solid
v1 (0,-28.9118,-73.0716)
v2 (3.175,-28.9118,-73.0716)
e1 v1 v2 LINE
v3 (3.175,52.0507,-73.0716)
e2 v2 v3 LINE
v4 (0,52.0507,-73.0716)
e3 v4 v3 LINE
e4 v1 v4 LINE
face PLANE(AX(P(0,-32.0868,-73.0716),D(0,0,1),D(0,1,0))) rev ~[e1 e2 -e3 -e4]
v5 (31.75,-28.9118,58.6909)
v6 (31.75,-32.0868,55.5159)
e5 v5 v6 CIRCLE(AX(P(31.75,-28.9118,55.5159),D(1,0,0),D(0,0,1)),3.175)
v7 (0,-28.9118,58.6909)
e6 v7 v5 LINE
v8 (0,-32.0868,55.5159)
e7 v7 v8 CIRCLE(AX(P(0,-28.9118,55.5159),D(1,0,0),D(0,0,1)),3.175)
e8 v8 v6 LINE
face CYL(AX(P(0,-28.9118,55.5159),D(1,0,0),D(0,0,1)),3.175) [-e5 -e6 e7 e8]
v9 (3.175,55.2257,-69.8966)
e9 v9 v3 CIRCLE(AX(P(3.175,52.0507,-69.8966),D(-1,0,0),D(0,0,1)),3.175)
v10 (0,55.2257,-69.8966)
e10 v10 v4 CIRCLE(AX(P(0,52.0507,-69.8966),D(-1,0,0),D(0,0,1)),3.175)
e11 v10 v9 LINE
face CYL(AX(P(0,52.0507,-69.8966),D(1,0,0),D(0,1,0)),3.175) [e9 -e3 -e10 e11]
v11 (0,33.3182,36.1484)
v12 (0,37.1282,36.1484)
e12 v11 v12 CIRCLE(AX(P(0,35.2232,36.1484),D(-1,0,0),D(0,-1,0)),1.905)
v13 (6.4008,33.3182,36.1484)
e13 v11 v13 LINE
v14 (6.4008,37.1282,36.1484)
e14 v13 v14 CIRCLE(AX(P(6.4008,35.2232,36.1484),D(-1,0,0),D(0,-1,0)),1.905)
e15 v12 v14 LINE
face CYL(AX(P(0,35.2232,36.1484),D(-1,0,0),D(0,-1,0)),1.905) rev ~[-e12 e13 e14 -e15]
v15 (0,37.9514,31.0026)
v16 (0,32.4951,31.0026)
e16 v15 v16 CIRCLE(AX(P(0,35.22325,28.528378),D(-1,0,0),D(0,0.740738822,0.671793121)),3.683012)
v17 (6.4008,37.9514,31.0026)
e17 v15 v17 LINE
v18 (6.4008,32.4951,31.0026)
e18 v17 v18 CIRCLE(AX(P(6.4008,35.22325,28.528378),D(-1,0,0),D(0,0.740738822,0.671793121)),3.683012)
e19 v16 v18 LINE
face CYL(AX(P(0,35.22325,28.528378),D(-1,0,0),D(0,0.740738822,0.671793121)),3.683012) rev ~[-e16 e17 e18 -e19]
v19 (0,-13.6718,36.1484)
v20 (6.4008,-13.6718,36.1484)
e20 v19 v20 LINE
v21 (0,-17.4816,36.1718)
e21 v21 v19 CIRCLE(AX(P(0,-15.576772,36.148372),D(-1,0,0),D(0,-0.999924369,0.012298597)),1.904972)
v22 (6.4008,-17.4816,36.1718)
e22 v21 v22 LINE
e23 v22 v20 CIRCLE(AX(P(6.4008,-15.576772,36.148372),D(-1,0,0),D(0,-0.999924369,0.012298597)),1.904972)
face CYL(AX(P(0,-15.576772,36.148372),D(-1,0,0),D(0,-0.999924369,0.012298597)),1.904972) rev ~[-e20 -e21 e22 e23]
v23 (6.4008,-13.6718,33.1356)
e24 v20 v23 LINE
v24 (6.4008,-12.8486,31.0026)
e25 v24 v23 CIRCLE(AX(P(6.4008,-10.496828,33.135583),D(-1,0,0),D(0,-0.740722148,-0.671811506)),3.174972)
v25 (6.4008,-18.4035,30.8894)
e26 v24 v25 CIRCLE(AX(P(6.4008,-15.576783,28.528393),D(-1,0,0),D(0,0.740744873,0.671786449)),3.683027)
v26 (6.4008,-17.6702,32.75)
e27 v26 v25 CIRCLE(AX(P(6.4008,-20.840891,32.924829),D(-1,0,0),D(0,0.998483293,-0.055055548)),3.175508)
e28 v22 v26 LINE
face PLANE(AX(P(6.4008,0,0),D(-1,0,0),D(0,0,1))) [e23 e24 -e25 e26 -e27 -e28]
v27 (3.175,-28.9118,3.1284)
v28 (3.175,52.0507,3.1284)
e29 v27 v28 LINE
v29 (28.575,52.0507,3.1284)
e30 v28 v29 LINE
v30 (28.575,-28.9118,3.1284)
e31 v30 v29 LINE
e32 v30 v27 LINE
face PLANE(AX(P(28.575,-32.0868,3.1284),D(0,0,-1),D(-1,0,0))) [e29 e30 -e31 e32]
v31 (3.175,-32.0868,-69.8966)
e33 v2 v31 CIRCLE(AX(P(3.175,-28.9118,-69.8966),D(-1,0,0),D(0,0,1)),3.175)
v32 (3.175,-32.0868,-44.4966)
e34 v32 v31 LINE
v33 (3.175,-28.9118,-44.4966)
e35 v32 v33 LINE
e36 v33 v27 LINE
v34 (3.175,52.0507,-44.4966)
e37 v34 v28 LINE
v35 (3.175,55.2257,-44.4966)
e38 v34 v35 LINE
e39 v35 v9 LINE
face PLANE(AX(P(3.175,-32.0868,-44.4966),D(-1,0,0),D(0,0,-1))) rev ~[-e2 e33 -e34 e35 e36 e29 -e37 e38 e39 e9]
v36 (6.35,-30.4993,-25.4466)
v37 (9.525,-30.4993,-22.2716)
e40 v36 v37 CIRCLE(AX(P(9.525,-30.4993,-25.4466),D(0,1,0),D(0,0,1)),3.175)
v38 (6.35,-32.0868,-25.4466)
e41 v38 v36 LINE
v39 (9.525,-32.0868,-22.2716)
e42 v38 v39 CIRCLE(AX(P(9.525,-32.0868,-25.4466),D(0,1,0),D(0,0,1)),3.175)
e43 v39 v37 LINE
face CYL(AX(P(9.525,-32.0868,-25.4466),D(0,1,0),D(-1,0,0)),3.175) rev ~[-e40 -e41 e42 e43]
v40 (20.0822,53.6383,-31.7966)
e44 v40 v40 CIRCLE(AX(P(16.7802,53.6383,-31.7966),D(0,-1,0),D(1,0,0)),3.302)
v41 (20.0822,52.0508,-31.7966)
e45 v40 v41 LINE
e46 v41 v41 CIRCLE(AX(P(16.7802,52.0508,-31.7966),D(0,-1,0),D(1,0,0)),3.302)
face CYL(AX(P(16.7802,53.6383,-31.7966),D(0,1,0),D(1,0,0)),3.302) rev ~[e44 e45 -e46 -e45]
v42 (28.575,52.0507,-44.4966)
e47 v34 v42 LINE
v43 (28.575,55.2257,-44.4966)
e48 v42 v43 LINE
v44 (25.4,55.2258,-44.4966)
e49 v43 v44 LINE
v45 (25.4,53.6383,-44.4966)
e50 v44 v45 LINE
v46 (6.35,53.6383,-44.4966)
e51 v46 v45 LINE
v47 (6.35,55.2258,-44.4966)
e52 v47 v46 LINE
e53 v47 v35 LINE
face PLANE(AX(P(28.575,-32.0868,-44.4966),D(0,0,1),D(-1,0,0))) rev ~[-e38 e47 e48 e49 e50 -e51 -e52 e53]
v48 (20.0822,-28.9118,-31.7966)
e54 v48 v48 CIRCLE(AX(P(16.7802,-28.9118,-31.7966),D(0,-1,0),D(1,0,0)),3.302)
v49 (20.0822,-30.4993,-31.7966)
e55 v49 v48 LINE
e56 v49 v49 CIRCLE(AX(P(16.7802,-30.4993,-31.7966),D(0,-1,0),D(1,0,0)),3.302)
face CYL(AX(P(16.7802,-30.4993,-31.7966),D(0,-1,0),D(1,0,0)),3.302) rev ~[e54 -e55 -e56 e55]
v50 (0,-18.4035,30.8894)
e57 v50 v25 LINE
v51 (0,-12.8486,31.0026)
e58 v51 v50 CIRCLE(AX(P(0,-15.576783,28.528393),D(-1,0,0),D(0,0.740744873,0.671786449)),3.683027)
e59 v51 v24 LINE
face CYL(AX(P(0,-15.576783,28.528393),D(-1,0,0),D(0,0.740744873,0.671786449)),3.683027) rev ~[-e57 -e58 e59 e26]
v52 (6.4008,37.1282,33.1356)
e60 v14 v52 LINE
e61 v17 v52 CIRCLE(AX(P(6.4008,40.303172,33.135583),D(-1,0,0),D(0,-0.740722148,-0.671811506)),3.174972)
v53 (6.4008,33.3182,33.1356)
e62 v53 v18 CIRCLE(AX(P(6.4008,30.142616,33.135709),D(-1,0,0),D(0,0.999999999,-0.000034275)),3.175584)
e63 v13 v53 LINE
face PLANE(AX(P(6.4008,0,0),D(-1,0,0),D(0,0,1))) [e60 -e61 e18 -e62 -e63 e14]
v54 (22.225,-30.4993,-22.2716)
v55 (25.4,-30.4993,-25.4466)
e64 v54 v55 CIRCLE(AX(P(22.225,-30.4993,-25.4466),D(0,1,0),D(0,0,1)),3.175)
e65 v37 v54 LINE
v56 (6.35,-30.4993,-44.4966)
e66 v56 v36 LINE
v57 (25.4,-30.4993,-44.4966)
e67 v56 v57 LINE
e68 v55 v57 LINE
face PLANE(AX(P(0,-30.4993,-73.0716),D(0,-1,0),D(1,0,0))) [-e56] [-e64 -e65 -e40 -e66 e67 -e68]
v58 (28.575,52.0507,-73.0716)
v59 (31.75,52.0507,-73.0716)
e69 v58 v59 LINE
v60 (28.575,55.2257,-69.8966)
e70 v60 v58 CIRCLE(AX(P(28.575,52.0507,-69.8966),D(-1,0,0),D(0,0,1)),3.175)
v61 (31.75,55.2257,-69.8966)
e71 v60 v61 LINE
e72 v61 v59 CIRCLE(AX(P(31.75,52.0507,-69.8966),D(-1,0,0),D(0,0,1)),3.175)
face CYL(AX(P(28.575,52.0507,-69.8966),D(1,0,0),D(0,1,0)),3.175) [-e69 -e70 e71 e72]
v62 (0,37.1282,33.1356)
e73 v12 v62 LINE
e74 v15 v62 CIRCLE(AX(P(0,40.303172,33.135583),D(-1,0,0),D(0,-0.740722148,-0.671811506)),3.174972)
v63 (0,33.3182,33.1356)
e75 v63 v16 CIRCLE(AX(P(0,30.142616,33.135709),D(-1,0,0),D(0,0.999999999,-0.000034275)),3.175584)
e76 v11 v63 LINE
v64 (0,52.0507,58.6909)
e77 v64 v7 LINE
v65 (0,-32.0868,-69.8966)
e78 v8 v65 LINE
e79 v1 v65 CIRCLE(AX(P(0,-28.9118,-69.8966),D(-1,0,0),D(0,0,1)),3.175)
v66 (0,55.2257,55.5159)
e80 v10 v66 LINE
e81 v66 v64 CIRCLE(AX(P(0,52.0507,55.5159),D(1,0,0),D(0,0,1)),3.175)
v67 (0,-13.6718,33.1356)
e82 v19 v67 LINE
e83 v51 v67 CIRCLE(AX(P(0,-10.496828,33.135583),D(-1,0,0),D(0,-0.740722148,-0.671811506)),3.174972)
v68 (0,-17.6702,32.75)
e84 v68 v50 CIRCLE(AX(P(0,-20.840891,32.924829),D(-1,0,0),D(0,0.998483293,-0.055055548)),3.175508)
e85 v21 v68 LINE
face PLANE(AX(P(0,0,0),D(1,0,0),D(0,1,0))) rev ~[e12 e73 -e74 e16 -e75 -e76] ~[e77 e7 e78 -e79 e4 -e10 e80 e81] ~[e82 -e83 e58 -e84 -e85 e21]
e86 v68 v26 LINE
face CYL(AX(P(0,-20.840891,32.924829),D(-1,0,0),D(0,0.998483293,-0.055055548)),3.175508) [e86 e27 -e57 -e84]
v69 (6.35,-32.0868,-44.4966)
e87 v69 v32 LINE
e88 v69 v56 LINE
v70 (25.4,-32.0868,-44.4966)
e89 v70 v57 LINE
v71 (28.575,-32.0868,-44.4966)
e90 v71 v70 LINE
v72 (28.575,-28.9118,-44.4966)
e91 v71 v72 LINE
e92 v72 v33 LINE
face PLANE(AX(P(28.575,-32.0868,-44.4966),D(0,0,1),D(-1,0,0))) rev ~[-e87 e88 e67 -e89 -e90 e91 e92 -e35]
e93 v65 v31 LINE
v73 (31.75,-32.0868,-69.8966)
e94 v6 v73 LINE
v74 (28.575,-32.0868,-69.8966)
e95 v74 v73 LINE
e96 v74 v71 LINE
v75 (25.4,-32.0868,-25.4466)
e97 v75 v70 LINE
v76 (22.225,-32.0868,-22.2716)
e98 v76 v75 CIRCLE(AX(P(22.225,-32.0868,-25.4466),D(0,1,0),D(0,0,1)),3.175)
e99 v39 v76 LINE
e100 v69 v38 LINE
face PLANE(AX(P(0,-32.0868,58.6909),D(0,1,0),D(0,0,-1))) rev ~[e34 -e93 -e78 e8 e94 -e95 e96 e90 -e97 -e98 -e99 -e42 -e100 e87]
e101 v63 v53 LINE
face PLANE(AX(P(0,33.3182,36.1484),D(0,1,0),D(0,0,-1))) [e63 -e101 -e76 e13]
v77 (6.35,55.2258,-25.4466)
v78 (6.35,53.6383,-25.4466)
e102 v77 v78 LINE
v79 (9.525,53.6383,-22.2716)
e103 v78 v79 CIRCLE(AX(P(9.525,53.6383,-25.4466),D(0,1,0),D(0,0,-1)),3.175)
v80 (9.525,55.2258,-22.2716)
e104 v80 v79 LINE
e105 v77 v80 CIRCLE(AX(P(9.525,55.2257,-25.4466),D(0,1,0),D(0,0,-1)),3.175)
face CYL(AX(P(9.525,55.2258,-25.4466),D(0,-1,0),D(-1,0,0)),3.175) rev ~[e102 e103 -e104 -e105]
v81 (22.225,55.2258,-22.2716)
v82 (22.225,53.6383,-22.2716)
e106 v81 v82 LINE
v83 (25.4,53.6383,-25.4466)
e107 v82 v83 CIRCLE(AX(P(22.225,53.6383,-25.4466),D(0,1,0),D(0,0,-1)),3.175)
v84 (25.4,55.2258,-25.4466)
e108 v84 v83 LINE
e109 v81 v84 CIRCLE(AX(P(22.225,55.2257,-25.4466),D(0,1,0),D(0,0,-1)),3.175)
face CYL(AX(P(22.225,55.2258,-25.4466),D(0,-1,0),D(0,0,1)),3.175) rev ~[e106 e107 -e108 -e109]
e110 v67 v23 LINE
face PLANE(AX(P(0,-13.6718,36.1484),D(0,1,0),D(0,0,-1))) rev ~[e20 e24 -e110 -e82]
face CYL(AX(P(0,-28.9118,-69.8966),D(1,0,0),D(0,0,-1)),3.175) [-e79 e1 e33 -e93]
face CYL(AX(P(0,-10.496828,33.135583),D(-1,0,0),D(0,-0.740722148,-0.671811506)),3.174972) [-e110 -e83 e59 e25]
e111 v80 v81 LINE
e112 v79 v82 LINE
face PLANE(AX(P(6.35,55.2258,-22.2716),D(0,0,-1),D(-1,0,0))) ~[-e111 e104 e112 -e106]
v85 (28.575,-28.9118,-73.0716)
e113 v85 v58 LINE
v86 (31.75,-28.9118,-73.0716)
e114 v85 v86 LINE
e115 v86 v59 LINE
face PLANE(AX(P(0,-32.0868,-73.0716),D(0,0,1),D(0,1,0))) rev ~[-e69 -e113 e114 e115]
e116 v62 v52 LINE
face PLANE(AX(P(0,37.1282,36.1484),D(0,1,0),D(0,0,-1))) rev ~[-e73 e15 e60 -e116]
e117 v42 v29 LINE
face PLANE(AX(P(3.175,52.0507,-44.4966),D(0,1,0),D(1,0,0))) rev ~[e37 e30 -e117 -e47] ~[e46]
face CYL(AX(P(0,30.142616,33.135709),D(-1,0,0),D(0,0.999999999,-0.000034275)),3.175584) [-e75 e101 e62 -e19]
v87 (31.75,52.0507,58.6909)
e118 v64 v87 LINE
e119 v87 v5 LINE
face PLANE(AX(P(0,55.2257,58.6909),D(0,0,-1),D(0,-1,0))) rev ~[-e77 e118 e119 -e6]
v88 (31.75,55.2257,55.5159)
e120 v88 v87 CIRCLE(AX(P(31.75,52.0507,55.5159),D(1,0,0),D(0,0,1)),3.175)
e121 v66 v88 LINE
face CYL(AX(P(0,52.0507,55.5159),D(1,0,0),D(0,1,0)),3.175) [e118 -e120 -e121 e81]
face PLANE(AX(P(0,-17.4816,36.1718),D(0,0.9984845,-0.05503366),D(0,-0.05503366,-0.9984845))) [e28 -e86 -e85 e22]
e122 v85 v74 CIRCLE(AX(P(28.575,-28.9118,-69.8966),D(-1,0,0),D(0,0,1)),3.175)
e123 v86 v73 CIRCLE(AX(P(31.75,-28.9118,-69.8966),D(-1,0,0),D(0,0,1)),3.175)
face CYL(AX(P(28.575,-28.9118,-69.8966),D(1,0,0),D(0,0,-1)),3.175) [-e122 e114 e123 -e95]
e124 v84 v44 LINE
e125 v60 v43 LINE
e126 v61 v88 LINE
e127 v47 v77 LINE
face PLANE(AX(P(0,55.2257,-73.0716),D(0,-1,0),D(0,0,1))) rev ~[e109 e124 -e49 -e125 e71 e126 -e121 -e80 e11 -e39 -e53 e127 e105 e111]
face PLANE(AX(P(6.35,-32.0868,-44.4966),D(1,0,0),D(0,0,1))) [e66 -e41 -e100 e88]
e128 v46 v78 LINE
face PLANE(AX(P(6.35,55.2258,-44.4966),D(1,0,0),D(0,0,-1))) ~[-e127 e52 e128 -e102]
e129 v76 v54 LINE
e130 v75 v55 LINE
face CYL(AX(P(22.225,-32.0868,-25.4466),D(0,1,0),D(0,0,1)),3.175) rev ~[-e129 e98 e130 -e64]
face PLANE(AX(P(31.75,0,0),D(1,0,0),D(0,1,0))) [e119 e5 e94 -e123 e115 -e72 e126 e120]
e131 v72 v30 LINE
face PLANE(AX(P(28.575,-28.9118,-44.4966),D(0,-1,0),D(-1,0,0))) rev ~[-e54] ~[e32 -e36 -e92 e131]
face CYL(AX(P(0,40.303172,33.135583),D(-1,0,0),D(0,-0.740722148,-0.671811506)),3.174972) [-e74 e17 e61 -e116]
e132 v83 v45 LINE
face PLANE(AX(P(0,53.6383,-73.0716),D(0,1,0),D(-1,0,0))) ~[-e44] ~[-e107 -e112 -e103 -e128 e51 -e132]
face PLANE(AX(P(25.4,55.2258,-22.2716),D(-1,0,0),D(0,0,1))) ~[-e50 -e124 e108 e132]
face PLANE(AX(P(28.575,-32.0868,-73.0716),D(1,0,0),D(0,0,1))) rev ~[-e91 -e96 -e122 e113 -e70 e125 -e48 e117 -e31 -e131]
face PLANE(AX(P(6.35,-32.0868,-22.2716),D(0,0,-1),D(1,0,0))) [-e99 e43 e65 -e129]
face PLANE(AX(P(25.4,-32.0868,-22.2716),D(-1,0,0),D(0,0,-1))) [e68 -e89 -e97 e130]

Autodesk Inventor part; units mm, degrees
ref_plane "YZ Plane" through (0, 0, 0) normal (1, 0, 0) x (0, 1, 0)
ref_plane "XZ Plane" through (0, 0, 0) normal (0, 1, 0) x (-1, 0, 0)
ref_plane "XY Plane" through (0, 0, 0) normal (0, 0, 1) x (1, 0, 0)
sketch "Sketch1" plane through (0, 0, 0) normal (1, 0, 0) x (0, 1, 0)
  line L0 (55.2257, 58.6909) -> (-32.0868, 58.6909)
  line L1 (-32.0868, 58.6909) -> (-32.0868, -73.0716)
  line L2 (-32.0868, -73.0716) -> (55.2257, -73.0716)
  line L3 (55.2257, -73.0716) -> (55.2257, 58.6909)
  point P0 (0, 0)
  dimension "d0" = 131.7625
  dimension "d1" = 87.3125
extrude "Extrusion1" add sketch "Sketch1" along normal blind 31.75
sketch "Sketch2" plane through (0, -32.0868, -73.0716) normal (0, -1, 0) x (1, 0, 0)
  line L0 (31.75, 131.7625) -> (31.75, 0) projected
  line L1 (0, 131.7625) -> (0, 0) projected
  line L2 (28.575, 28.575) -> (3.175, 28.575)
  line L3 (3.175, 28.575) -> (3.175, 0)
  line L4 (3.175, 0) -> (28.575, 0)
  line L5 (28.575, 0) -> (28.575, 28.575)
  point P0 (0, 73.0716)
  point P1 (31.75, 28.575)
  dimension "d7" = 3.175
  dimension "d8" = 3.175
  dimension "d9" = 28.575
extrude "Extrusion2" cut sketch "Sketch2" against normal blind 87.3125
sketch "Sketch3" plane through (28.575, -32.0868, -44.4966) normal (0, 0, -1) x (-1, 0, 0)
  line L0 (0, 0) -> (0, 87.3125) projected
  line L1 (25.4, 0) -> (25.4, 87.3125) projected
  line L2 (0, 3.175) -> (25.4, 3.175)
  line L3 (25.4, 3.175) -> (25.4, 84.1375)
  line L4 (25.4, 84.1375) -> (0, 84.1375)
  line L5 (0, 84.1375) -> (0, 3.175)
  line L6 (0, 87.3125) -> (25.4, 87.3125) projected
  line L7 (25.4, 0) -> (0, 0) projected
  point P0 (28.575, 32.0868)
  point P1 (12.7, 84.1375)
  point P2 (12.7, 3.175)
  point P3 (0, 84.1375)
  point P4 (25.4, 3.175)
  dimension "d10" = 3.175
  dimension "d11" = 3.175
extrude "Extrusion3" cut sketch "Sketch3" against normal blind 47.625 contours L0 L4 L1 L2
sketch "Sketch4" plane through (0, -32.0868, -73.0716) normal (0, -1, 0) x (1, 0, 0)
  line L0 (3.175, 28.575) -> (28.575, 28.575) projected
  line L1 (25.4, 28.575) -> (6.35, 28.575)
  line L2 (6.35, 28.575) -> (6.35, 50.8)
  line L3 (6.35, 50.8) -> (25.4, 50.8)
  line L4 (25.4, 50.8) -> (25.4, 28.575)
  line L5 (31.75, 131.7625) -> (31.75, 0) projected
  circle A0 centre (16.7802, 41.275) radius 3.302
  point P0 (0, 73.0716)
  point P1 (15.875, 50.8)
  point P2 (15.875, 28.575)
  point P3 (25.4, 39.6875)
  point P4 (6.35, 28.575)
  dimension "d14" = 22.225
  dimension "d15" = 19.05
  dimension "d16" = 6.35
  dimension "d17" = 6.604
  dimension "d18" = 12.7
extrude "Extrusion4" cut sketch "Sketch4" against normal blind 1.5875
sketch "Sketch6" plane through (0, -30.4993, -73.0716) normal (0, -1, 0) x (1, 0, 0)
  circle A0 centre (16.7802, 41.275) radius 3.302 projected
  circle A1 centre (16.7802, 41.275) radius 3.302
  point P0 (0, 73.0716)
extrude "Extrusion5" cut sketch "Sketch6" along normal mid plane 3.175
ref_plane "Work Plane2" through (0, 11.5695, -73.0716) normal (0, -1, 0) x (1, 0, 0)
mirror "Mirror1" about plane through (0, 11.5695, -73.0716) normal (0, -1, 0) of "Extrusion4"
mirror "Mirror2" about plane through (0, 11.5695, -73.0716) normal (0, -1, 0) of "Extrusion5"
fillet "Fillet1" radius 3.175 4 edges at (30.1625, -32.0868, -73.0716) (1.5875, -32.0868, -73.0716) (30.1625, 55.2257, -73.0716) (1.5875, 55.2257, -73.0716)
fillet "Fillet2" radius 3.175 2 edges at (15.875, -32.0868, 58.6909) (15.875, 55.2257, 58.6909)
fillet "Fillet3" radius 3.175 4 edges at (6.35, -31.293, -22.2716) (25.4, -31.293, -22.2716) (25.4, 54.432, -22.2716) (6.35, 54.432, -22.2716)
sketch "Sketch8" plane through (0, 0, 0) normal (-1, 0, 0) x (0, 0, 1)
  line L0 (-69.8966, 55.2257) -> (55.5159, 55.2257) projected
  line L1 (-73.0716, -28.9118) -> (-73.0716, 52.0507) projected
  arc A0 (31.0026, -12.8486) -> (30.8894, -18.4035) centre (28.5284, -15.5768) ccw
  arc A1 (36.1718, -17.4816) -> (36.1484, -13.6718) centre (36.1484, -15.5768) ccw
  line L2 (36.1484, -13.6718) -> (33.1356, -13.6718)
  line L3 (36.1718, -17.4816) -> (32.75, -17.6702)
  arc A2 (31.0026, -12.8486) -> (33.1356, -13.6718) centre (33.1356, -10.4968) ccw
  arc A3 (32.75, -17.6702) -> (30.8894, -18.4035) centre (32.9247, -20.8403) ccw
  line L4 (55.5159, -32.0868) -> (-69.8966, -32.0868) projected
  arc A4 (31.0026, 37.9514) -> (31.0026, 32.4951) centre (28.5284, 35.2232) ccw
  arc A5 (36.1484, 33.3182) -> (36.1484, 37.1282) centre (36.1484, 35.2232) ccw
  line L5 (36.1484, 37.1282) -> (33.1356, 37.1282)
  line L6 (36.1484, 33.3182) -> (33.1356, 33.3182)
  arc A6 (31.0026, 37.9514) -> (33.1356, 37.1282) centre (33.1356, 40.3032) ccw
  arc A7 (33.1356, 33.3182) -> (31.0026, 32.4951) centre (33.1356, 30.1432) ccw
  point P0 (0, 0)
  point P1 (31.6805, -13.6718)
  point P2 (31.5103, -17.7385)
  point P3 (31.8314, 36.8525)
  point P4 (31.2779, 32.7727)
  point P5 (31.6805, 37.1282)
  point P6 (31.6805, 33.3182)
  dimension "d57" = 3.81
  dimension "d58" = 7.366
  dimension "d59" = 3.175
  dimension "d60" = 101.6
  dimension "d61" = 109.22
  dimension "d63" = 0
  dimension "d77" = 101.6
  dimension "d78" = 109.22
  dimension "d79" = 50.8
  dimension "d80" = 20.0025
  dimension "d81" = 3.81
  dimension "d82" = 7.366
  dimension "d83" = 3.175
extrude "Extrusion7" cut sketch "Sketch8" against normal blind 6.4008
properties part number "cDAQ_Chassis_LowPolyPlaceholder"
